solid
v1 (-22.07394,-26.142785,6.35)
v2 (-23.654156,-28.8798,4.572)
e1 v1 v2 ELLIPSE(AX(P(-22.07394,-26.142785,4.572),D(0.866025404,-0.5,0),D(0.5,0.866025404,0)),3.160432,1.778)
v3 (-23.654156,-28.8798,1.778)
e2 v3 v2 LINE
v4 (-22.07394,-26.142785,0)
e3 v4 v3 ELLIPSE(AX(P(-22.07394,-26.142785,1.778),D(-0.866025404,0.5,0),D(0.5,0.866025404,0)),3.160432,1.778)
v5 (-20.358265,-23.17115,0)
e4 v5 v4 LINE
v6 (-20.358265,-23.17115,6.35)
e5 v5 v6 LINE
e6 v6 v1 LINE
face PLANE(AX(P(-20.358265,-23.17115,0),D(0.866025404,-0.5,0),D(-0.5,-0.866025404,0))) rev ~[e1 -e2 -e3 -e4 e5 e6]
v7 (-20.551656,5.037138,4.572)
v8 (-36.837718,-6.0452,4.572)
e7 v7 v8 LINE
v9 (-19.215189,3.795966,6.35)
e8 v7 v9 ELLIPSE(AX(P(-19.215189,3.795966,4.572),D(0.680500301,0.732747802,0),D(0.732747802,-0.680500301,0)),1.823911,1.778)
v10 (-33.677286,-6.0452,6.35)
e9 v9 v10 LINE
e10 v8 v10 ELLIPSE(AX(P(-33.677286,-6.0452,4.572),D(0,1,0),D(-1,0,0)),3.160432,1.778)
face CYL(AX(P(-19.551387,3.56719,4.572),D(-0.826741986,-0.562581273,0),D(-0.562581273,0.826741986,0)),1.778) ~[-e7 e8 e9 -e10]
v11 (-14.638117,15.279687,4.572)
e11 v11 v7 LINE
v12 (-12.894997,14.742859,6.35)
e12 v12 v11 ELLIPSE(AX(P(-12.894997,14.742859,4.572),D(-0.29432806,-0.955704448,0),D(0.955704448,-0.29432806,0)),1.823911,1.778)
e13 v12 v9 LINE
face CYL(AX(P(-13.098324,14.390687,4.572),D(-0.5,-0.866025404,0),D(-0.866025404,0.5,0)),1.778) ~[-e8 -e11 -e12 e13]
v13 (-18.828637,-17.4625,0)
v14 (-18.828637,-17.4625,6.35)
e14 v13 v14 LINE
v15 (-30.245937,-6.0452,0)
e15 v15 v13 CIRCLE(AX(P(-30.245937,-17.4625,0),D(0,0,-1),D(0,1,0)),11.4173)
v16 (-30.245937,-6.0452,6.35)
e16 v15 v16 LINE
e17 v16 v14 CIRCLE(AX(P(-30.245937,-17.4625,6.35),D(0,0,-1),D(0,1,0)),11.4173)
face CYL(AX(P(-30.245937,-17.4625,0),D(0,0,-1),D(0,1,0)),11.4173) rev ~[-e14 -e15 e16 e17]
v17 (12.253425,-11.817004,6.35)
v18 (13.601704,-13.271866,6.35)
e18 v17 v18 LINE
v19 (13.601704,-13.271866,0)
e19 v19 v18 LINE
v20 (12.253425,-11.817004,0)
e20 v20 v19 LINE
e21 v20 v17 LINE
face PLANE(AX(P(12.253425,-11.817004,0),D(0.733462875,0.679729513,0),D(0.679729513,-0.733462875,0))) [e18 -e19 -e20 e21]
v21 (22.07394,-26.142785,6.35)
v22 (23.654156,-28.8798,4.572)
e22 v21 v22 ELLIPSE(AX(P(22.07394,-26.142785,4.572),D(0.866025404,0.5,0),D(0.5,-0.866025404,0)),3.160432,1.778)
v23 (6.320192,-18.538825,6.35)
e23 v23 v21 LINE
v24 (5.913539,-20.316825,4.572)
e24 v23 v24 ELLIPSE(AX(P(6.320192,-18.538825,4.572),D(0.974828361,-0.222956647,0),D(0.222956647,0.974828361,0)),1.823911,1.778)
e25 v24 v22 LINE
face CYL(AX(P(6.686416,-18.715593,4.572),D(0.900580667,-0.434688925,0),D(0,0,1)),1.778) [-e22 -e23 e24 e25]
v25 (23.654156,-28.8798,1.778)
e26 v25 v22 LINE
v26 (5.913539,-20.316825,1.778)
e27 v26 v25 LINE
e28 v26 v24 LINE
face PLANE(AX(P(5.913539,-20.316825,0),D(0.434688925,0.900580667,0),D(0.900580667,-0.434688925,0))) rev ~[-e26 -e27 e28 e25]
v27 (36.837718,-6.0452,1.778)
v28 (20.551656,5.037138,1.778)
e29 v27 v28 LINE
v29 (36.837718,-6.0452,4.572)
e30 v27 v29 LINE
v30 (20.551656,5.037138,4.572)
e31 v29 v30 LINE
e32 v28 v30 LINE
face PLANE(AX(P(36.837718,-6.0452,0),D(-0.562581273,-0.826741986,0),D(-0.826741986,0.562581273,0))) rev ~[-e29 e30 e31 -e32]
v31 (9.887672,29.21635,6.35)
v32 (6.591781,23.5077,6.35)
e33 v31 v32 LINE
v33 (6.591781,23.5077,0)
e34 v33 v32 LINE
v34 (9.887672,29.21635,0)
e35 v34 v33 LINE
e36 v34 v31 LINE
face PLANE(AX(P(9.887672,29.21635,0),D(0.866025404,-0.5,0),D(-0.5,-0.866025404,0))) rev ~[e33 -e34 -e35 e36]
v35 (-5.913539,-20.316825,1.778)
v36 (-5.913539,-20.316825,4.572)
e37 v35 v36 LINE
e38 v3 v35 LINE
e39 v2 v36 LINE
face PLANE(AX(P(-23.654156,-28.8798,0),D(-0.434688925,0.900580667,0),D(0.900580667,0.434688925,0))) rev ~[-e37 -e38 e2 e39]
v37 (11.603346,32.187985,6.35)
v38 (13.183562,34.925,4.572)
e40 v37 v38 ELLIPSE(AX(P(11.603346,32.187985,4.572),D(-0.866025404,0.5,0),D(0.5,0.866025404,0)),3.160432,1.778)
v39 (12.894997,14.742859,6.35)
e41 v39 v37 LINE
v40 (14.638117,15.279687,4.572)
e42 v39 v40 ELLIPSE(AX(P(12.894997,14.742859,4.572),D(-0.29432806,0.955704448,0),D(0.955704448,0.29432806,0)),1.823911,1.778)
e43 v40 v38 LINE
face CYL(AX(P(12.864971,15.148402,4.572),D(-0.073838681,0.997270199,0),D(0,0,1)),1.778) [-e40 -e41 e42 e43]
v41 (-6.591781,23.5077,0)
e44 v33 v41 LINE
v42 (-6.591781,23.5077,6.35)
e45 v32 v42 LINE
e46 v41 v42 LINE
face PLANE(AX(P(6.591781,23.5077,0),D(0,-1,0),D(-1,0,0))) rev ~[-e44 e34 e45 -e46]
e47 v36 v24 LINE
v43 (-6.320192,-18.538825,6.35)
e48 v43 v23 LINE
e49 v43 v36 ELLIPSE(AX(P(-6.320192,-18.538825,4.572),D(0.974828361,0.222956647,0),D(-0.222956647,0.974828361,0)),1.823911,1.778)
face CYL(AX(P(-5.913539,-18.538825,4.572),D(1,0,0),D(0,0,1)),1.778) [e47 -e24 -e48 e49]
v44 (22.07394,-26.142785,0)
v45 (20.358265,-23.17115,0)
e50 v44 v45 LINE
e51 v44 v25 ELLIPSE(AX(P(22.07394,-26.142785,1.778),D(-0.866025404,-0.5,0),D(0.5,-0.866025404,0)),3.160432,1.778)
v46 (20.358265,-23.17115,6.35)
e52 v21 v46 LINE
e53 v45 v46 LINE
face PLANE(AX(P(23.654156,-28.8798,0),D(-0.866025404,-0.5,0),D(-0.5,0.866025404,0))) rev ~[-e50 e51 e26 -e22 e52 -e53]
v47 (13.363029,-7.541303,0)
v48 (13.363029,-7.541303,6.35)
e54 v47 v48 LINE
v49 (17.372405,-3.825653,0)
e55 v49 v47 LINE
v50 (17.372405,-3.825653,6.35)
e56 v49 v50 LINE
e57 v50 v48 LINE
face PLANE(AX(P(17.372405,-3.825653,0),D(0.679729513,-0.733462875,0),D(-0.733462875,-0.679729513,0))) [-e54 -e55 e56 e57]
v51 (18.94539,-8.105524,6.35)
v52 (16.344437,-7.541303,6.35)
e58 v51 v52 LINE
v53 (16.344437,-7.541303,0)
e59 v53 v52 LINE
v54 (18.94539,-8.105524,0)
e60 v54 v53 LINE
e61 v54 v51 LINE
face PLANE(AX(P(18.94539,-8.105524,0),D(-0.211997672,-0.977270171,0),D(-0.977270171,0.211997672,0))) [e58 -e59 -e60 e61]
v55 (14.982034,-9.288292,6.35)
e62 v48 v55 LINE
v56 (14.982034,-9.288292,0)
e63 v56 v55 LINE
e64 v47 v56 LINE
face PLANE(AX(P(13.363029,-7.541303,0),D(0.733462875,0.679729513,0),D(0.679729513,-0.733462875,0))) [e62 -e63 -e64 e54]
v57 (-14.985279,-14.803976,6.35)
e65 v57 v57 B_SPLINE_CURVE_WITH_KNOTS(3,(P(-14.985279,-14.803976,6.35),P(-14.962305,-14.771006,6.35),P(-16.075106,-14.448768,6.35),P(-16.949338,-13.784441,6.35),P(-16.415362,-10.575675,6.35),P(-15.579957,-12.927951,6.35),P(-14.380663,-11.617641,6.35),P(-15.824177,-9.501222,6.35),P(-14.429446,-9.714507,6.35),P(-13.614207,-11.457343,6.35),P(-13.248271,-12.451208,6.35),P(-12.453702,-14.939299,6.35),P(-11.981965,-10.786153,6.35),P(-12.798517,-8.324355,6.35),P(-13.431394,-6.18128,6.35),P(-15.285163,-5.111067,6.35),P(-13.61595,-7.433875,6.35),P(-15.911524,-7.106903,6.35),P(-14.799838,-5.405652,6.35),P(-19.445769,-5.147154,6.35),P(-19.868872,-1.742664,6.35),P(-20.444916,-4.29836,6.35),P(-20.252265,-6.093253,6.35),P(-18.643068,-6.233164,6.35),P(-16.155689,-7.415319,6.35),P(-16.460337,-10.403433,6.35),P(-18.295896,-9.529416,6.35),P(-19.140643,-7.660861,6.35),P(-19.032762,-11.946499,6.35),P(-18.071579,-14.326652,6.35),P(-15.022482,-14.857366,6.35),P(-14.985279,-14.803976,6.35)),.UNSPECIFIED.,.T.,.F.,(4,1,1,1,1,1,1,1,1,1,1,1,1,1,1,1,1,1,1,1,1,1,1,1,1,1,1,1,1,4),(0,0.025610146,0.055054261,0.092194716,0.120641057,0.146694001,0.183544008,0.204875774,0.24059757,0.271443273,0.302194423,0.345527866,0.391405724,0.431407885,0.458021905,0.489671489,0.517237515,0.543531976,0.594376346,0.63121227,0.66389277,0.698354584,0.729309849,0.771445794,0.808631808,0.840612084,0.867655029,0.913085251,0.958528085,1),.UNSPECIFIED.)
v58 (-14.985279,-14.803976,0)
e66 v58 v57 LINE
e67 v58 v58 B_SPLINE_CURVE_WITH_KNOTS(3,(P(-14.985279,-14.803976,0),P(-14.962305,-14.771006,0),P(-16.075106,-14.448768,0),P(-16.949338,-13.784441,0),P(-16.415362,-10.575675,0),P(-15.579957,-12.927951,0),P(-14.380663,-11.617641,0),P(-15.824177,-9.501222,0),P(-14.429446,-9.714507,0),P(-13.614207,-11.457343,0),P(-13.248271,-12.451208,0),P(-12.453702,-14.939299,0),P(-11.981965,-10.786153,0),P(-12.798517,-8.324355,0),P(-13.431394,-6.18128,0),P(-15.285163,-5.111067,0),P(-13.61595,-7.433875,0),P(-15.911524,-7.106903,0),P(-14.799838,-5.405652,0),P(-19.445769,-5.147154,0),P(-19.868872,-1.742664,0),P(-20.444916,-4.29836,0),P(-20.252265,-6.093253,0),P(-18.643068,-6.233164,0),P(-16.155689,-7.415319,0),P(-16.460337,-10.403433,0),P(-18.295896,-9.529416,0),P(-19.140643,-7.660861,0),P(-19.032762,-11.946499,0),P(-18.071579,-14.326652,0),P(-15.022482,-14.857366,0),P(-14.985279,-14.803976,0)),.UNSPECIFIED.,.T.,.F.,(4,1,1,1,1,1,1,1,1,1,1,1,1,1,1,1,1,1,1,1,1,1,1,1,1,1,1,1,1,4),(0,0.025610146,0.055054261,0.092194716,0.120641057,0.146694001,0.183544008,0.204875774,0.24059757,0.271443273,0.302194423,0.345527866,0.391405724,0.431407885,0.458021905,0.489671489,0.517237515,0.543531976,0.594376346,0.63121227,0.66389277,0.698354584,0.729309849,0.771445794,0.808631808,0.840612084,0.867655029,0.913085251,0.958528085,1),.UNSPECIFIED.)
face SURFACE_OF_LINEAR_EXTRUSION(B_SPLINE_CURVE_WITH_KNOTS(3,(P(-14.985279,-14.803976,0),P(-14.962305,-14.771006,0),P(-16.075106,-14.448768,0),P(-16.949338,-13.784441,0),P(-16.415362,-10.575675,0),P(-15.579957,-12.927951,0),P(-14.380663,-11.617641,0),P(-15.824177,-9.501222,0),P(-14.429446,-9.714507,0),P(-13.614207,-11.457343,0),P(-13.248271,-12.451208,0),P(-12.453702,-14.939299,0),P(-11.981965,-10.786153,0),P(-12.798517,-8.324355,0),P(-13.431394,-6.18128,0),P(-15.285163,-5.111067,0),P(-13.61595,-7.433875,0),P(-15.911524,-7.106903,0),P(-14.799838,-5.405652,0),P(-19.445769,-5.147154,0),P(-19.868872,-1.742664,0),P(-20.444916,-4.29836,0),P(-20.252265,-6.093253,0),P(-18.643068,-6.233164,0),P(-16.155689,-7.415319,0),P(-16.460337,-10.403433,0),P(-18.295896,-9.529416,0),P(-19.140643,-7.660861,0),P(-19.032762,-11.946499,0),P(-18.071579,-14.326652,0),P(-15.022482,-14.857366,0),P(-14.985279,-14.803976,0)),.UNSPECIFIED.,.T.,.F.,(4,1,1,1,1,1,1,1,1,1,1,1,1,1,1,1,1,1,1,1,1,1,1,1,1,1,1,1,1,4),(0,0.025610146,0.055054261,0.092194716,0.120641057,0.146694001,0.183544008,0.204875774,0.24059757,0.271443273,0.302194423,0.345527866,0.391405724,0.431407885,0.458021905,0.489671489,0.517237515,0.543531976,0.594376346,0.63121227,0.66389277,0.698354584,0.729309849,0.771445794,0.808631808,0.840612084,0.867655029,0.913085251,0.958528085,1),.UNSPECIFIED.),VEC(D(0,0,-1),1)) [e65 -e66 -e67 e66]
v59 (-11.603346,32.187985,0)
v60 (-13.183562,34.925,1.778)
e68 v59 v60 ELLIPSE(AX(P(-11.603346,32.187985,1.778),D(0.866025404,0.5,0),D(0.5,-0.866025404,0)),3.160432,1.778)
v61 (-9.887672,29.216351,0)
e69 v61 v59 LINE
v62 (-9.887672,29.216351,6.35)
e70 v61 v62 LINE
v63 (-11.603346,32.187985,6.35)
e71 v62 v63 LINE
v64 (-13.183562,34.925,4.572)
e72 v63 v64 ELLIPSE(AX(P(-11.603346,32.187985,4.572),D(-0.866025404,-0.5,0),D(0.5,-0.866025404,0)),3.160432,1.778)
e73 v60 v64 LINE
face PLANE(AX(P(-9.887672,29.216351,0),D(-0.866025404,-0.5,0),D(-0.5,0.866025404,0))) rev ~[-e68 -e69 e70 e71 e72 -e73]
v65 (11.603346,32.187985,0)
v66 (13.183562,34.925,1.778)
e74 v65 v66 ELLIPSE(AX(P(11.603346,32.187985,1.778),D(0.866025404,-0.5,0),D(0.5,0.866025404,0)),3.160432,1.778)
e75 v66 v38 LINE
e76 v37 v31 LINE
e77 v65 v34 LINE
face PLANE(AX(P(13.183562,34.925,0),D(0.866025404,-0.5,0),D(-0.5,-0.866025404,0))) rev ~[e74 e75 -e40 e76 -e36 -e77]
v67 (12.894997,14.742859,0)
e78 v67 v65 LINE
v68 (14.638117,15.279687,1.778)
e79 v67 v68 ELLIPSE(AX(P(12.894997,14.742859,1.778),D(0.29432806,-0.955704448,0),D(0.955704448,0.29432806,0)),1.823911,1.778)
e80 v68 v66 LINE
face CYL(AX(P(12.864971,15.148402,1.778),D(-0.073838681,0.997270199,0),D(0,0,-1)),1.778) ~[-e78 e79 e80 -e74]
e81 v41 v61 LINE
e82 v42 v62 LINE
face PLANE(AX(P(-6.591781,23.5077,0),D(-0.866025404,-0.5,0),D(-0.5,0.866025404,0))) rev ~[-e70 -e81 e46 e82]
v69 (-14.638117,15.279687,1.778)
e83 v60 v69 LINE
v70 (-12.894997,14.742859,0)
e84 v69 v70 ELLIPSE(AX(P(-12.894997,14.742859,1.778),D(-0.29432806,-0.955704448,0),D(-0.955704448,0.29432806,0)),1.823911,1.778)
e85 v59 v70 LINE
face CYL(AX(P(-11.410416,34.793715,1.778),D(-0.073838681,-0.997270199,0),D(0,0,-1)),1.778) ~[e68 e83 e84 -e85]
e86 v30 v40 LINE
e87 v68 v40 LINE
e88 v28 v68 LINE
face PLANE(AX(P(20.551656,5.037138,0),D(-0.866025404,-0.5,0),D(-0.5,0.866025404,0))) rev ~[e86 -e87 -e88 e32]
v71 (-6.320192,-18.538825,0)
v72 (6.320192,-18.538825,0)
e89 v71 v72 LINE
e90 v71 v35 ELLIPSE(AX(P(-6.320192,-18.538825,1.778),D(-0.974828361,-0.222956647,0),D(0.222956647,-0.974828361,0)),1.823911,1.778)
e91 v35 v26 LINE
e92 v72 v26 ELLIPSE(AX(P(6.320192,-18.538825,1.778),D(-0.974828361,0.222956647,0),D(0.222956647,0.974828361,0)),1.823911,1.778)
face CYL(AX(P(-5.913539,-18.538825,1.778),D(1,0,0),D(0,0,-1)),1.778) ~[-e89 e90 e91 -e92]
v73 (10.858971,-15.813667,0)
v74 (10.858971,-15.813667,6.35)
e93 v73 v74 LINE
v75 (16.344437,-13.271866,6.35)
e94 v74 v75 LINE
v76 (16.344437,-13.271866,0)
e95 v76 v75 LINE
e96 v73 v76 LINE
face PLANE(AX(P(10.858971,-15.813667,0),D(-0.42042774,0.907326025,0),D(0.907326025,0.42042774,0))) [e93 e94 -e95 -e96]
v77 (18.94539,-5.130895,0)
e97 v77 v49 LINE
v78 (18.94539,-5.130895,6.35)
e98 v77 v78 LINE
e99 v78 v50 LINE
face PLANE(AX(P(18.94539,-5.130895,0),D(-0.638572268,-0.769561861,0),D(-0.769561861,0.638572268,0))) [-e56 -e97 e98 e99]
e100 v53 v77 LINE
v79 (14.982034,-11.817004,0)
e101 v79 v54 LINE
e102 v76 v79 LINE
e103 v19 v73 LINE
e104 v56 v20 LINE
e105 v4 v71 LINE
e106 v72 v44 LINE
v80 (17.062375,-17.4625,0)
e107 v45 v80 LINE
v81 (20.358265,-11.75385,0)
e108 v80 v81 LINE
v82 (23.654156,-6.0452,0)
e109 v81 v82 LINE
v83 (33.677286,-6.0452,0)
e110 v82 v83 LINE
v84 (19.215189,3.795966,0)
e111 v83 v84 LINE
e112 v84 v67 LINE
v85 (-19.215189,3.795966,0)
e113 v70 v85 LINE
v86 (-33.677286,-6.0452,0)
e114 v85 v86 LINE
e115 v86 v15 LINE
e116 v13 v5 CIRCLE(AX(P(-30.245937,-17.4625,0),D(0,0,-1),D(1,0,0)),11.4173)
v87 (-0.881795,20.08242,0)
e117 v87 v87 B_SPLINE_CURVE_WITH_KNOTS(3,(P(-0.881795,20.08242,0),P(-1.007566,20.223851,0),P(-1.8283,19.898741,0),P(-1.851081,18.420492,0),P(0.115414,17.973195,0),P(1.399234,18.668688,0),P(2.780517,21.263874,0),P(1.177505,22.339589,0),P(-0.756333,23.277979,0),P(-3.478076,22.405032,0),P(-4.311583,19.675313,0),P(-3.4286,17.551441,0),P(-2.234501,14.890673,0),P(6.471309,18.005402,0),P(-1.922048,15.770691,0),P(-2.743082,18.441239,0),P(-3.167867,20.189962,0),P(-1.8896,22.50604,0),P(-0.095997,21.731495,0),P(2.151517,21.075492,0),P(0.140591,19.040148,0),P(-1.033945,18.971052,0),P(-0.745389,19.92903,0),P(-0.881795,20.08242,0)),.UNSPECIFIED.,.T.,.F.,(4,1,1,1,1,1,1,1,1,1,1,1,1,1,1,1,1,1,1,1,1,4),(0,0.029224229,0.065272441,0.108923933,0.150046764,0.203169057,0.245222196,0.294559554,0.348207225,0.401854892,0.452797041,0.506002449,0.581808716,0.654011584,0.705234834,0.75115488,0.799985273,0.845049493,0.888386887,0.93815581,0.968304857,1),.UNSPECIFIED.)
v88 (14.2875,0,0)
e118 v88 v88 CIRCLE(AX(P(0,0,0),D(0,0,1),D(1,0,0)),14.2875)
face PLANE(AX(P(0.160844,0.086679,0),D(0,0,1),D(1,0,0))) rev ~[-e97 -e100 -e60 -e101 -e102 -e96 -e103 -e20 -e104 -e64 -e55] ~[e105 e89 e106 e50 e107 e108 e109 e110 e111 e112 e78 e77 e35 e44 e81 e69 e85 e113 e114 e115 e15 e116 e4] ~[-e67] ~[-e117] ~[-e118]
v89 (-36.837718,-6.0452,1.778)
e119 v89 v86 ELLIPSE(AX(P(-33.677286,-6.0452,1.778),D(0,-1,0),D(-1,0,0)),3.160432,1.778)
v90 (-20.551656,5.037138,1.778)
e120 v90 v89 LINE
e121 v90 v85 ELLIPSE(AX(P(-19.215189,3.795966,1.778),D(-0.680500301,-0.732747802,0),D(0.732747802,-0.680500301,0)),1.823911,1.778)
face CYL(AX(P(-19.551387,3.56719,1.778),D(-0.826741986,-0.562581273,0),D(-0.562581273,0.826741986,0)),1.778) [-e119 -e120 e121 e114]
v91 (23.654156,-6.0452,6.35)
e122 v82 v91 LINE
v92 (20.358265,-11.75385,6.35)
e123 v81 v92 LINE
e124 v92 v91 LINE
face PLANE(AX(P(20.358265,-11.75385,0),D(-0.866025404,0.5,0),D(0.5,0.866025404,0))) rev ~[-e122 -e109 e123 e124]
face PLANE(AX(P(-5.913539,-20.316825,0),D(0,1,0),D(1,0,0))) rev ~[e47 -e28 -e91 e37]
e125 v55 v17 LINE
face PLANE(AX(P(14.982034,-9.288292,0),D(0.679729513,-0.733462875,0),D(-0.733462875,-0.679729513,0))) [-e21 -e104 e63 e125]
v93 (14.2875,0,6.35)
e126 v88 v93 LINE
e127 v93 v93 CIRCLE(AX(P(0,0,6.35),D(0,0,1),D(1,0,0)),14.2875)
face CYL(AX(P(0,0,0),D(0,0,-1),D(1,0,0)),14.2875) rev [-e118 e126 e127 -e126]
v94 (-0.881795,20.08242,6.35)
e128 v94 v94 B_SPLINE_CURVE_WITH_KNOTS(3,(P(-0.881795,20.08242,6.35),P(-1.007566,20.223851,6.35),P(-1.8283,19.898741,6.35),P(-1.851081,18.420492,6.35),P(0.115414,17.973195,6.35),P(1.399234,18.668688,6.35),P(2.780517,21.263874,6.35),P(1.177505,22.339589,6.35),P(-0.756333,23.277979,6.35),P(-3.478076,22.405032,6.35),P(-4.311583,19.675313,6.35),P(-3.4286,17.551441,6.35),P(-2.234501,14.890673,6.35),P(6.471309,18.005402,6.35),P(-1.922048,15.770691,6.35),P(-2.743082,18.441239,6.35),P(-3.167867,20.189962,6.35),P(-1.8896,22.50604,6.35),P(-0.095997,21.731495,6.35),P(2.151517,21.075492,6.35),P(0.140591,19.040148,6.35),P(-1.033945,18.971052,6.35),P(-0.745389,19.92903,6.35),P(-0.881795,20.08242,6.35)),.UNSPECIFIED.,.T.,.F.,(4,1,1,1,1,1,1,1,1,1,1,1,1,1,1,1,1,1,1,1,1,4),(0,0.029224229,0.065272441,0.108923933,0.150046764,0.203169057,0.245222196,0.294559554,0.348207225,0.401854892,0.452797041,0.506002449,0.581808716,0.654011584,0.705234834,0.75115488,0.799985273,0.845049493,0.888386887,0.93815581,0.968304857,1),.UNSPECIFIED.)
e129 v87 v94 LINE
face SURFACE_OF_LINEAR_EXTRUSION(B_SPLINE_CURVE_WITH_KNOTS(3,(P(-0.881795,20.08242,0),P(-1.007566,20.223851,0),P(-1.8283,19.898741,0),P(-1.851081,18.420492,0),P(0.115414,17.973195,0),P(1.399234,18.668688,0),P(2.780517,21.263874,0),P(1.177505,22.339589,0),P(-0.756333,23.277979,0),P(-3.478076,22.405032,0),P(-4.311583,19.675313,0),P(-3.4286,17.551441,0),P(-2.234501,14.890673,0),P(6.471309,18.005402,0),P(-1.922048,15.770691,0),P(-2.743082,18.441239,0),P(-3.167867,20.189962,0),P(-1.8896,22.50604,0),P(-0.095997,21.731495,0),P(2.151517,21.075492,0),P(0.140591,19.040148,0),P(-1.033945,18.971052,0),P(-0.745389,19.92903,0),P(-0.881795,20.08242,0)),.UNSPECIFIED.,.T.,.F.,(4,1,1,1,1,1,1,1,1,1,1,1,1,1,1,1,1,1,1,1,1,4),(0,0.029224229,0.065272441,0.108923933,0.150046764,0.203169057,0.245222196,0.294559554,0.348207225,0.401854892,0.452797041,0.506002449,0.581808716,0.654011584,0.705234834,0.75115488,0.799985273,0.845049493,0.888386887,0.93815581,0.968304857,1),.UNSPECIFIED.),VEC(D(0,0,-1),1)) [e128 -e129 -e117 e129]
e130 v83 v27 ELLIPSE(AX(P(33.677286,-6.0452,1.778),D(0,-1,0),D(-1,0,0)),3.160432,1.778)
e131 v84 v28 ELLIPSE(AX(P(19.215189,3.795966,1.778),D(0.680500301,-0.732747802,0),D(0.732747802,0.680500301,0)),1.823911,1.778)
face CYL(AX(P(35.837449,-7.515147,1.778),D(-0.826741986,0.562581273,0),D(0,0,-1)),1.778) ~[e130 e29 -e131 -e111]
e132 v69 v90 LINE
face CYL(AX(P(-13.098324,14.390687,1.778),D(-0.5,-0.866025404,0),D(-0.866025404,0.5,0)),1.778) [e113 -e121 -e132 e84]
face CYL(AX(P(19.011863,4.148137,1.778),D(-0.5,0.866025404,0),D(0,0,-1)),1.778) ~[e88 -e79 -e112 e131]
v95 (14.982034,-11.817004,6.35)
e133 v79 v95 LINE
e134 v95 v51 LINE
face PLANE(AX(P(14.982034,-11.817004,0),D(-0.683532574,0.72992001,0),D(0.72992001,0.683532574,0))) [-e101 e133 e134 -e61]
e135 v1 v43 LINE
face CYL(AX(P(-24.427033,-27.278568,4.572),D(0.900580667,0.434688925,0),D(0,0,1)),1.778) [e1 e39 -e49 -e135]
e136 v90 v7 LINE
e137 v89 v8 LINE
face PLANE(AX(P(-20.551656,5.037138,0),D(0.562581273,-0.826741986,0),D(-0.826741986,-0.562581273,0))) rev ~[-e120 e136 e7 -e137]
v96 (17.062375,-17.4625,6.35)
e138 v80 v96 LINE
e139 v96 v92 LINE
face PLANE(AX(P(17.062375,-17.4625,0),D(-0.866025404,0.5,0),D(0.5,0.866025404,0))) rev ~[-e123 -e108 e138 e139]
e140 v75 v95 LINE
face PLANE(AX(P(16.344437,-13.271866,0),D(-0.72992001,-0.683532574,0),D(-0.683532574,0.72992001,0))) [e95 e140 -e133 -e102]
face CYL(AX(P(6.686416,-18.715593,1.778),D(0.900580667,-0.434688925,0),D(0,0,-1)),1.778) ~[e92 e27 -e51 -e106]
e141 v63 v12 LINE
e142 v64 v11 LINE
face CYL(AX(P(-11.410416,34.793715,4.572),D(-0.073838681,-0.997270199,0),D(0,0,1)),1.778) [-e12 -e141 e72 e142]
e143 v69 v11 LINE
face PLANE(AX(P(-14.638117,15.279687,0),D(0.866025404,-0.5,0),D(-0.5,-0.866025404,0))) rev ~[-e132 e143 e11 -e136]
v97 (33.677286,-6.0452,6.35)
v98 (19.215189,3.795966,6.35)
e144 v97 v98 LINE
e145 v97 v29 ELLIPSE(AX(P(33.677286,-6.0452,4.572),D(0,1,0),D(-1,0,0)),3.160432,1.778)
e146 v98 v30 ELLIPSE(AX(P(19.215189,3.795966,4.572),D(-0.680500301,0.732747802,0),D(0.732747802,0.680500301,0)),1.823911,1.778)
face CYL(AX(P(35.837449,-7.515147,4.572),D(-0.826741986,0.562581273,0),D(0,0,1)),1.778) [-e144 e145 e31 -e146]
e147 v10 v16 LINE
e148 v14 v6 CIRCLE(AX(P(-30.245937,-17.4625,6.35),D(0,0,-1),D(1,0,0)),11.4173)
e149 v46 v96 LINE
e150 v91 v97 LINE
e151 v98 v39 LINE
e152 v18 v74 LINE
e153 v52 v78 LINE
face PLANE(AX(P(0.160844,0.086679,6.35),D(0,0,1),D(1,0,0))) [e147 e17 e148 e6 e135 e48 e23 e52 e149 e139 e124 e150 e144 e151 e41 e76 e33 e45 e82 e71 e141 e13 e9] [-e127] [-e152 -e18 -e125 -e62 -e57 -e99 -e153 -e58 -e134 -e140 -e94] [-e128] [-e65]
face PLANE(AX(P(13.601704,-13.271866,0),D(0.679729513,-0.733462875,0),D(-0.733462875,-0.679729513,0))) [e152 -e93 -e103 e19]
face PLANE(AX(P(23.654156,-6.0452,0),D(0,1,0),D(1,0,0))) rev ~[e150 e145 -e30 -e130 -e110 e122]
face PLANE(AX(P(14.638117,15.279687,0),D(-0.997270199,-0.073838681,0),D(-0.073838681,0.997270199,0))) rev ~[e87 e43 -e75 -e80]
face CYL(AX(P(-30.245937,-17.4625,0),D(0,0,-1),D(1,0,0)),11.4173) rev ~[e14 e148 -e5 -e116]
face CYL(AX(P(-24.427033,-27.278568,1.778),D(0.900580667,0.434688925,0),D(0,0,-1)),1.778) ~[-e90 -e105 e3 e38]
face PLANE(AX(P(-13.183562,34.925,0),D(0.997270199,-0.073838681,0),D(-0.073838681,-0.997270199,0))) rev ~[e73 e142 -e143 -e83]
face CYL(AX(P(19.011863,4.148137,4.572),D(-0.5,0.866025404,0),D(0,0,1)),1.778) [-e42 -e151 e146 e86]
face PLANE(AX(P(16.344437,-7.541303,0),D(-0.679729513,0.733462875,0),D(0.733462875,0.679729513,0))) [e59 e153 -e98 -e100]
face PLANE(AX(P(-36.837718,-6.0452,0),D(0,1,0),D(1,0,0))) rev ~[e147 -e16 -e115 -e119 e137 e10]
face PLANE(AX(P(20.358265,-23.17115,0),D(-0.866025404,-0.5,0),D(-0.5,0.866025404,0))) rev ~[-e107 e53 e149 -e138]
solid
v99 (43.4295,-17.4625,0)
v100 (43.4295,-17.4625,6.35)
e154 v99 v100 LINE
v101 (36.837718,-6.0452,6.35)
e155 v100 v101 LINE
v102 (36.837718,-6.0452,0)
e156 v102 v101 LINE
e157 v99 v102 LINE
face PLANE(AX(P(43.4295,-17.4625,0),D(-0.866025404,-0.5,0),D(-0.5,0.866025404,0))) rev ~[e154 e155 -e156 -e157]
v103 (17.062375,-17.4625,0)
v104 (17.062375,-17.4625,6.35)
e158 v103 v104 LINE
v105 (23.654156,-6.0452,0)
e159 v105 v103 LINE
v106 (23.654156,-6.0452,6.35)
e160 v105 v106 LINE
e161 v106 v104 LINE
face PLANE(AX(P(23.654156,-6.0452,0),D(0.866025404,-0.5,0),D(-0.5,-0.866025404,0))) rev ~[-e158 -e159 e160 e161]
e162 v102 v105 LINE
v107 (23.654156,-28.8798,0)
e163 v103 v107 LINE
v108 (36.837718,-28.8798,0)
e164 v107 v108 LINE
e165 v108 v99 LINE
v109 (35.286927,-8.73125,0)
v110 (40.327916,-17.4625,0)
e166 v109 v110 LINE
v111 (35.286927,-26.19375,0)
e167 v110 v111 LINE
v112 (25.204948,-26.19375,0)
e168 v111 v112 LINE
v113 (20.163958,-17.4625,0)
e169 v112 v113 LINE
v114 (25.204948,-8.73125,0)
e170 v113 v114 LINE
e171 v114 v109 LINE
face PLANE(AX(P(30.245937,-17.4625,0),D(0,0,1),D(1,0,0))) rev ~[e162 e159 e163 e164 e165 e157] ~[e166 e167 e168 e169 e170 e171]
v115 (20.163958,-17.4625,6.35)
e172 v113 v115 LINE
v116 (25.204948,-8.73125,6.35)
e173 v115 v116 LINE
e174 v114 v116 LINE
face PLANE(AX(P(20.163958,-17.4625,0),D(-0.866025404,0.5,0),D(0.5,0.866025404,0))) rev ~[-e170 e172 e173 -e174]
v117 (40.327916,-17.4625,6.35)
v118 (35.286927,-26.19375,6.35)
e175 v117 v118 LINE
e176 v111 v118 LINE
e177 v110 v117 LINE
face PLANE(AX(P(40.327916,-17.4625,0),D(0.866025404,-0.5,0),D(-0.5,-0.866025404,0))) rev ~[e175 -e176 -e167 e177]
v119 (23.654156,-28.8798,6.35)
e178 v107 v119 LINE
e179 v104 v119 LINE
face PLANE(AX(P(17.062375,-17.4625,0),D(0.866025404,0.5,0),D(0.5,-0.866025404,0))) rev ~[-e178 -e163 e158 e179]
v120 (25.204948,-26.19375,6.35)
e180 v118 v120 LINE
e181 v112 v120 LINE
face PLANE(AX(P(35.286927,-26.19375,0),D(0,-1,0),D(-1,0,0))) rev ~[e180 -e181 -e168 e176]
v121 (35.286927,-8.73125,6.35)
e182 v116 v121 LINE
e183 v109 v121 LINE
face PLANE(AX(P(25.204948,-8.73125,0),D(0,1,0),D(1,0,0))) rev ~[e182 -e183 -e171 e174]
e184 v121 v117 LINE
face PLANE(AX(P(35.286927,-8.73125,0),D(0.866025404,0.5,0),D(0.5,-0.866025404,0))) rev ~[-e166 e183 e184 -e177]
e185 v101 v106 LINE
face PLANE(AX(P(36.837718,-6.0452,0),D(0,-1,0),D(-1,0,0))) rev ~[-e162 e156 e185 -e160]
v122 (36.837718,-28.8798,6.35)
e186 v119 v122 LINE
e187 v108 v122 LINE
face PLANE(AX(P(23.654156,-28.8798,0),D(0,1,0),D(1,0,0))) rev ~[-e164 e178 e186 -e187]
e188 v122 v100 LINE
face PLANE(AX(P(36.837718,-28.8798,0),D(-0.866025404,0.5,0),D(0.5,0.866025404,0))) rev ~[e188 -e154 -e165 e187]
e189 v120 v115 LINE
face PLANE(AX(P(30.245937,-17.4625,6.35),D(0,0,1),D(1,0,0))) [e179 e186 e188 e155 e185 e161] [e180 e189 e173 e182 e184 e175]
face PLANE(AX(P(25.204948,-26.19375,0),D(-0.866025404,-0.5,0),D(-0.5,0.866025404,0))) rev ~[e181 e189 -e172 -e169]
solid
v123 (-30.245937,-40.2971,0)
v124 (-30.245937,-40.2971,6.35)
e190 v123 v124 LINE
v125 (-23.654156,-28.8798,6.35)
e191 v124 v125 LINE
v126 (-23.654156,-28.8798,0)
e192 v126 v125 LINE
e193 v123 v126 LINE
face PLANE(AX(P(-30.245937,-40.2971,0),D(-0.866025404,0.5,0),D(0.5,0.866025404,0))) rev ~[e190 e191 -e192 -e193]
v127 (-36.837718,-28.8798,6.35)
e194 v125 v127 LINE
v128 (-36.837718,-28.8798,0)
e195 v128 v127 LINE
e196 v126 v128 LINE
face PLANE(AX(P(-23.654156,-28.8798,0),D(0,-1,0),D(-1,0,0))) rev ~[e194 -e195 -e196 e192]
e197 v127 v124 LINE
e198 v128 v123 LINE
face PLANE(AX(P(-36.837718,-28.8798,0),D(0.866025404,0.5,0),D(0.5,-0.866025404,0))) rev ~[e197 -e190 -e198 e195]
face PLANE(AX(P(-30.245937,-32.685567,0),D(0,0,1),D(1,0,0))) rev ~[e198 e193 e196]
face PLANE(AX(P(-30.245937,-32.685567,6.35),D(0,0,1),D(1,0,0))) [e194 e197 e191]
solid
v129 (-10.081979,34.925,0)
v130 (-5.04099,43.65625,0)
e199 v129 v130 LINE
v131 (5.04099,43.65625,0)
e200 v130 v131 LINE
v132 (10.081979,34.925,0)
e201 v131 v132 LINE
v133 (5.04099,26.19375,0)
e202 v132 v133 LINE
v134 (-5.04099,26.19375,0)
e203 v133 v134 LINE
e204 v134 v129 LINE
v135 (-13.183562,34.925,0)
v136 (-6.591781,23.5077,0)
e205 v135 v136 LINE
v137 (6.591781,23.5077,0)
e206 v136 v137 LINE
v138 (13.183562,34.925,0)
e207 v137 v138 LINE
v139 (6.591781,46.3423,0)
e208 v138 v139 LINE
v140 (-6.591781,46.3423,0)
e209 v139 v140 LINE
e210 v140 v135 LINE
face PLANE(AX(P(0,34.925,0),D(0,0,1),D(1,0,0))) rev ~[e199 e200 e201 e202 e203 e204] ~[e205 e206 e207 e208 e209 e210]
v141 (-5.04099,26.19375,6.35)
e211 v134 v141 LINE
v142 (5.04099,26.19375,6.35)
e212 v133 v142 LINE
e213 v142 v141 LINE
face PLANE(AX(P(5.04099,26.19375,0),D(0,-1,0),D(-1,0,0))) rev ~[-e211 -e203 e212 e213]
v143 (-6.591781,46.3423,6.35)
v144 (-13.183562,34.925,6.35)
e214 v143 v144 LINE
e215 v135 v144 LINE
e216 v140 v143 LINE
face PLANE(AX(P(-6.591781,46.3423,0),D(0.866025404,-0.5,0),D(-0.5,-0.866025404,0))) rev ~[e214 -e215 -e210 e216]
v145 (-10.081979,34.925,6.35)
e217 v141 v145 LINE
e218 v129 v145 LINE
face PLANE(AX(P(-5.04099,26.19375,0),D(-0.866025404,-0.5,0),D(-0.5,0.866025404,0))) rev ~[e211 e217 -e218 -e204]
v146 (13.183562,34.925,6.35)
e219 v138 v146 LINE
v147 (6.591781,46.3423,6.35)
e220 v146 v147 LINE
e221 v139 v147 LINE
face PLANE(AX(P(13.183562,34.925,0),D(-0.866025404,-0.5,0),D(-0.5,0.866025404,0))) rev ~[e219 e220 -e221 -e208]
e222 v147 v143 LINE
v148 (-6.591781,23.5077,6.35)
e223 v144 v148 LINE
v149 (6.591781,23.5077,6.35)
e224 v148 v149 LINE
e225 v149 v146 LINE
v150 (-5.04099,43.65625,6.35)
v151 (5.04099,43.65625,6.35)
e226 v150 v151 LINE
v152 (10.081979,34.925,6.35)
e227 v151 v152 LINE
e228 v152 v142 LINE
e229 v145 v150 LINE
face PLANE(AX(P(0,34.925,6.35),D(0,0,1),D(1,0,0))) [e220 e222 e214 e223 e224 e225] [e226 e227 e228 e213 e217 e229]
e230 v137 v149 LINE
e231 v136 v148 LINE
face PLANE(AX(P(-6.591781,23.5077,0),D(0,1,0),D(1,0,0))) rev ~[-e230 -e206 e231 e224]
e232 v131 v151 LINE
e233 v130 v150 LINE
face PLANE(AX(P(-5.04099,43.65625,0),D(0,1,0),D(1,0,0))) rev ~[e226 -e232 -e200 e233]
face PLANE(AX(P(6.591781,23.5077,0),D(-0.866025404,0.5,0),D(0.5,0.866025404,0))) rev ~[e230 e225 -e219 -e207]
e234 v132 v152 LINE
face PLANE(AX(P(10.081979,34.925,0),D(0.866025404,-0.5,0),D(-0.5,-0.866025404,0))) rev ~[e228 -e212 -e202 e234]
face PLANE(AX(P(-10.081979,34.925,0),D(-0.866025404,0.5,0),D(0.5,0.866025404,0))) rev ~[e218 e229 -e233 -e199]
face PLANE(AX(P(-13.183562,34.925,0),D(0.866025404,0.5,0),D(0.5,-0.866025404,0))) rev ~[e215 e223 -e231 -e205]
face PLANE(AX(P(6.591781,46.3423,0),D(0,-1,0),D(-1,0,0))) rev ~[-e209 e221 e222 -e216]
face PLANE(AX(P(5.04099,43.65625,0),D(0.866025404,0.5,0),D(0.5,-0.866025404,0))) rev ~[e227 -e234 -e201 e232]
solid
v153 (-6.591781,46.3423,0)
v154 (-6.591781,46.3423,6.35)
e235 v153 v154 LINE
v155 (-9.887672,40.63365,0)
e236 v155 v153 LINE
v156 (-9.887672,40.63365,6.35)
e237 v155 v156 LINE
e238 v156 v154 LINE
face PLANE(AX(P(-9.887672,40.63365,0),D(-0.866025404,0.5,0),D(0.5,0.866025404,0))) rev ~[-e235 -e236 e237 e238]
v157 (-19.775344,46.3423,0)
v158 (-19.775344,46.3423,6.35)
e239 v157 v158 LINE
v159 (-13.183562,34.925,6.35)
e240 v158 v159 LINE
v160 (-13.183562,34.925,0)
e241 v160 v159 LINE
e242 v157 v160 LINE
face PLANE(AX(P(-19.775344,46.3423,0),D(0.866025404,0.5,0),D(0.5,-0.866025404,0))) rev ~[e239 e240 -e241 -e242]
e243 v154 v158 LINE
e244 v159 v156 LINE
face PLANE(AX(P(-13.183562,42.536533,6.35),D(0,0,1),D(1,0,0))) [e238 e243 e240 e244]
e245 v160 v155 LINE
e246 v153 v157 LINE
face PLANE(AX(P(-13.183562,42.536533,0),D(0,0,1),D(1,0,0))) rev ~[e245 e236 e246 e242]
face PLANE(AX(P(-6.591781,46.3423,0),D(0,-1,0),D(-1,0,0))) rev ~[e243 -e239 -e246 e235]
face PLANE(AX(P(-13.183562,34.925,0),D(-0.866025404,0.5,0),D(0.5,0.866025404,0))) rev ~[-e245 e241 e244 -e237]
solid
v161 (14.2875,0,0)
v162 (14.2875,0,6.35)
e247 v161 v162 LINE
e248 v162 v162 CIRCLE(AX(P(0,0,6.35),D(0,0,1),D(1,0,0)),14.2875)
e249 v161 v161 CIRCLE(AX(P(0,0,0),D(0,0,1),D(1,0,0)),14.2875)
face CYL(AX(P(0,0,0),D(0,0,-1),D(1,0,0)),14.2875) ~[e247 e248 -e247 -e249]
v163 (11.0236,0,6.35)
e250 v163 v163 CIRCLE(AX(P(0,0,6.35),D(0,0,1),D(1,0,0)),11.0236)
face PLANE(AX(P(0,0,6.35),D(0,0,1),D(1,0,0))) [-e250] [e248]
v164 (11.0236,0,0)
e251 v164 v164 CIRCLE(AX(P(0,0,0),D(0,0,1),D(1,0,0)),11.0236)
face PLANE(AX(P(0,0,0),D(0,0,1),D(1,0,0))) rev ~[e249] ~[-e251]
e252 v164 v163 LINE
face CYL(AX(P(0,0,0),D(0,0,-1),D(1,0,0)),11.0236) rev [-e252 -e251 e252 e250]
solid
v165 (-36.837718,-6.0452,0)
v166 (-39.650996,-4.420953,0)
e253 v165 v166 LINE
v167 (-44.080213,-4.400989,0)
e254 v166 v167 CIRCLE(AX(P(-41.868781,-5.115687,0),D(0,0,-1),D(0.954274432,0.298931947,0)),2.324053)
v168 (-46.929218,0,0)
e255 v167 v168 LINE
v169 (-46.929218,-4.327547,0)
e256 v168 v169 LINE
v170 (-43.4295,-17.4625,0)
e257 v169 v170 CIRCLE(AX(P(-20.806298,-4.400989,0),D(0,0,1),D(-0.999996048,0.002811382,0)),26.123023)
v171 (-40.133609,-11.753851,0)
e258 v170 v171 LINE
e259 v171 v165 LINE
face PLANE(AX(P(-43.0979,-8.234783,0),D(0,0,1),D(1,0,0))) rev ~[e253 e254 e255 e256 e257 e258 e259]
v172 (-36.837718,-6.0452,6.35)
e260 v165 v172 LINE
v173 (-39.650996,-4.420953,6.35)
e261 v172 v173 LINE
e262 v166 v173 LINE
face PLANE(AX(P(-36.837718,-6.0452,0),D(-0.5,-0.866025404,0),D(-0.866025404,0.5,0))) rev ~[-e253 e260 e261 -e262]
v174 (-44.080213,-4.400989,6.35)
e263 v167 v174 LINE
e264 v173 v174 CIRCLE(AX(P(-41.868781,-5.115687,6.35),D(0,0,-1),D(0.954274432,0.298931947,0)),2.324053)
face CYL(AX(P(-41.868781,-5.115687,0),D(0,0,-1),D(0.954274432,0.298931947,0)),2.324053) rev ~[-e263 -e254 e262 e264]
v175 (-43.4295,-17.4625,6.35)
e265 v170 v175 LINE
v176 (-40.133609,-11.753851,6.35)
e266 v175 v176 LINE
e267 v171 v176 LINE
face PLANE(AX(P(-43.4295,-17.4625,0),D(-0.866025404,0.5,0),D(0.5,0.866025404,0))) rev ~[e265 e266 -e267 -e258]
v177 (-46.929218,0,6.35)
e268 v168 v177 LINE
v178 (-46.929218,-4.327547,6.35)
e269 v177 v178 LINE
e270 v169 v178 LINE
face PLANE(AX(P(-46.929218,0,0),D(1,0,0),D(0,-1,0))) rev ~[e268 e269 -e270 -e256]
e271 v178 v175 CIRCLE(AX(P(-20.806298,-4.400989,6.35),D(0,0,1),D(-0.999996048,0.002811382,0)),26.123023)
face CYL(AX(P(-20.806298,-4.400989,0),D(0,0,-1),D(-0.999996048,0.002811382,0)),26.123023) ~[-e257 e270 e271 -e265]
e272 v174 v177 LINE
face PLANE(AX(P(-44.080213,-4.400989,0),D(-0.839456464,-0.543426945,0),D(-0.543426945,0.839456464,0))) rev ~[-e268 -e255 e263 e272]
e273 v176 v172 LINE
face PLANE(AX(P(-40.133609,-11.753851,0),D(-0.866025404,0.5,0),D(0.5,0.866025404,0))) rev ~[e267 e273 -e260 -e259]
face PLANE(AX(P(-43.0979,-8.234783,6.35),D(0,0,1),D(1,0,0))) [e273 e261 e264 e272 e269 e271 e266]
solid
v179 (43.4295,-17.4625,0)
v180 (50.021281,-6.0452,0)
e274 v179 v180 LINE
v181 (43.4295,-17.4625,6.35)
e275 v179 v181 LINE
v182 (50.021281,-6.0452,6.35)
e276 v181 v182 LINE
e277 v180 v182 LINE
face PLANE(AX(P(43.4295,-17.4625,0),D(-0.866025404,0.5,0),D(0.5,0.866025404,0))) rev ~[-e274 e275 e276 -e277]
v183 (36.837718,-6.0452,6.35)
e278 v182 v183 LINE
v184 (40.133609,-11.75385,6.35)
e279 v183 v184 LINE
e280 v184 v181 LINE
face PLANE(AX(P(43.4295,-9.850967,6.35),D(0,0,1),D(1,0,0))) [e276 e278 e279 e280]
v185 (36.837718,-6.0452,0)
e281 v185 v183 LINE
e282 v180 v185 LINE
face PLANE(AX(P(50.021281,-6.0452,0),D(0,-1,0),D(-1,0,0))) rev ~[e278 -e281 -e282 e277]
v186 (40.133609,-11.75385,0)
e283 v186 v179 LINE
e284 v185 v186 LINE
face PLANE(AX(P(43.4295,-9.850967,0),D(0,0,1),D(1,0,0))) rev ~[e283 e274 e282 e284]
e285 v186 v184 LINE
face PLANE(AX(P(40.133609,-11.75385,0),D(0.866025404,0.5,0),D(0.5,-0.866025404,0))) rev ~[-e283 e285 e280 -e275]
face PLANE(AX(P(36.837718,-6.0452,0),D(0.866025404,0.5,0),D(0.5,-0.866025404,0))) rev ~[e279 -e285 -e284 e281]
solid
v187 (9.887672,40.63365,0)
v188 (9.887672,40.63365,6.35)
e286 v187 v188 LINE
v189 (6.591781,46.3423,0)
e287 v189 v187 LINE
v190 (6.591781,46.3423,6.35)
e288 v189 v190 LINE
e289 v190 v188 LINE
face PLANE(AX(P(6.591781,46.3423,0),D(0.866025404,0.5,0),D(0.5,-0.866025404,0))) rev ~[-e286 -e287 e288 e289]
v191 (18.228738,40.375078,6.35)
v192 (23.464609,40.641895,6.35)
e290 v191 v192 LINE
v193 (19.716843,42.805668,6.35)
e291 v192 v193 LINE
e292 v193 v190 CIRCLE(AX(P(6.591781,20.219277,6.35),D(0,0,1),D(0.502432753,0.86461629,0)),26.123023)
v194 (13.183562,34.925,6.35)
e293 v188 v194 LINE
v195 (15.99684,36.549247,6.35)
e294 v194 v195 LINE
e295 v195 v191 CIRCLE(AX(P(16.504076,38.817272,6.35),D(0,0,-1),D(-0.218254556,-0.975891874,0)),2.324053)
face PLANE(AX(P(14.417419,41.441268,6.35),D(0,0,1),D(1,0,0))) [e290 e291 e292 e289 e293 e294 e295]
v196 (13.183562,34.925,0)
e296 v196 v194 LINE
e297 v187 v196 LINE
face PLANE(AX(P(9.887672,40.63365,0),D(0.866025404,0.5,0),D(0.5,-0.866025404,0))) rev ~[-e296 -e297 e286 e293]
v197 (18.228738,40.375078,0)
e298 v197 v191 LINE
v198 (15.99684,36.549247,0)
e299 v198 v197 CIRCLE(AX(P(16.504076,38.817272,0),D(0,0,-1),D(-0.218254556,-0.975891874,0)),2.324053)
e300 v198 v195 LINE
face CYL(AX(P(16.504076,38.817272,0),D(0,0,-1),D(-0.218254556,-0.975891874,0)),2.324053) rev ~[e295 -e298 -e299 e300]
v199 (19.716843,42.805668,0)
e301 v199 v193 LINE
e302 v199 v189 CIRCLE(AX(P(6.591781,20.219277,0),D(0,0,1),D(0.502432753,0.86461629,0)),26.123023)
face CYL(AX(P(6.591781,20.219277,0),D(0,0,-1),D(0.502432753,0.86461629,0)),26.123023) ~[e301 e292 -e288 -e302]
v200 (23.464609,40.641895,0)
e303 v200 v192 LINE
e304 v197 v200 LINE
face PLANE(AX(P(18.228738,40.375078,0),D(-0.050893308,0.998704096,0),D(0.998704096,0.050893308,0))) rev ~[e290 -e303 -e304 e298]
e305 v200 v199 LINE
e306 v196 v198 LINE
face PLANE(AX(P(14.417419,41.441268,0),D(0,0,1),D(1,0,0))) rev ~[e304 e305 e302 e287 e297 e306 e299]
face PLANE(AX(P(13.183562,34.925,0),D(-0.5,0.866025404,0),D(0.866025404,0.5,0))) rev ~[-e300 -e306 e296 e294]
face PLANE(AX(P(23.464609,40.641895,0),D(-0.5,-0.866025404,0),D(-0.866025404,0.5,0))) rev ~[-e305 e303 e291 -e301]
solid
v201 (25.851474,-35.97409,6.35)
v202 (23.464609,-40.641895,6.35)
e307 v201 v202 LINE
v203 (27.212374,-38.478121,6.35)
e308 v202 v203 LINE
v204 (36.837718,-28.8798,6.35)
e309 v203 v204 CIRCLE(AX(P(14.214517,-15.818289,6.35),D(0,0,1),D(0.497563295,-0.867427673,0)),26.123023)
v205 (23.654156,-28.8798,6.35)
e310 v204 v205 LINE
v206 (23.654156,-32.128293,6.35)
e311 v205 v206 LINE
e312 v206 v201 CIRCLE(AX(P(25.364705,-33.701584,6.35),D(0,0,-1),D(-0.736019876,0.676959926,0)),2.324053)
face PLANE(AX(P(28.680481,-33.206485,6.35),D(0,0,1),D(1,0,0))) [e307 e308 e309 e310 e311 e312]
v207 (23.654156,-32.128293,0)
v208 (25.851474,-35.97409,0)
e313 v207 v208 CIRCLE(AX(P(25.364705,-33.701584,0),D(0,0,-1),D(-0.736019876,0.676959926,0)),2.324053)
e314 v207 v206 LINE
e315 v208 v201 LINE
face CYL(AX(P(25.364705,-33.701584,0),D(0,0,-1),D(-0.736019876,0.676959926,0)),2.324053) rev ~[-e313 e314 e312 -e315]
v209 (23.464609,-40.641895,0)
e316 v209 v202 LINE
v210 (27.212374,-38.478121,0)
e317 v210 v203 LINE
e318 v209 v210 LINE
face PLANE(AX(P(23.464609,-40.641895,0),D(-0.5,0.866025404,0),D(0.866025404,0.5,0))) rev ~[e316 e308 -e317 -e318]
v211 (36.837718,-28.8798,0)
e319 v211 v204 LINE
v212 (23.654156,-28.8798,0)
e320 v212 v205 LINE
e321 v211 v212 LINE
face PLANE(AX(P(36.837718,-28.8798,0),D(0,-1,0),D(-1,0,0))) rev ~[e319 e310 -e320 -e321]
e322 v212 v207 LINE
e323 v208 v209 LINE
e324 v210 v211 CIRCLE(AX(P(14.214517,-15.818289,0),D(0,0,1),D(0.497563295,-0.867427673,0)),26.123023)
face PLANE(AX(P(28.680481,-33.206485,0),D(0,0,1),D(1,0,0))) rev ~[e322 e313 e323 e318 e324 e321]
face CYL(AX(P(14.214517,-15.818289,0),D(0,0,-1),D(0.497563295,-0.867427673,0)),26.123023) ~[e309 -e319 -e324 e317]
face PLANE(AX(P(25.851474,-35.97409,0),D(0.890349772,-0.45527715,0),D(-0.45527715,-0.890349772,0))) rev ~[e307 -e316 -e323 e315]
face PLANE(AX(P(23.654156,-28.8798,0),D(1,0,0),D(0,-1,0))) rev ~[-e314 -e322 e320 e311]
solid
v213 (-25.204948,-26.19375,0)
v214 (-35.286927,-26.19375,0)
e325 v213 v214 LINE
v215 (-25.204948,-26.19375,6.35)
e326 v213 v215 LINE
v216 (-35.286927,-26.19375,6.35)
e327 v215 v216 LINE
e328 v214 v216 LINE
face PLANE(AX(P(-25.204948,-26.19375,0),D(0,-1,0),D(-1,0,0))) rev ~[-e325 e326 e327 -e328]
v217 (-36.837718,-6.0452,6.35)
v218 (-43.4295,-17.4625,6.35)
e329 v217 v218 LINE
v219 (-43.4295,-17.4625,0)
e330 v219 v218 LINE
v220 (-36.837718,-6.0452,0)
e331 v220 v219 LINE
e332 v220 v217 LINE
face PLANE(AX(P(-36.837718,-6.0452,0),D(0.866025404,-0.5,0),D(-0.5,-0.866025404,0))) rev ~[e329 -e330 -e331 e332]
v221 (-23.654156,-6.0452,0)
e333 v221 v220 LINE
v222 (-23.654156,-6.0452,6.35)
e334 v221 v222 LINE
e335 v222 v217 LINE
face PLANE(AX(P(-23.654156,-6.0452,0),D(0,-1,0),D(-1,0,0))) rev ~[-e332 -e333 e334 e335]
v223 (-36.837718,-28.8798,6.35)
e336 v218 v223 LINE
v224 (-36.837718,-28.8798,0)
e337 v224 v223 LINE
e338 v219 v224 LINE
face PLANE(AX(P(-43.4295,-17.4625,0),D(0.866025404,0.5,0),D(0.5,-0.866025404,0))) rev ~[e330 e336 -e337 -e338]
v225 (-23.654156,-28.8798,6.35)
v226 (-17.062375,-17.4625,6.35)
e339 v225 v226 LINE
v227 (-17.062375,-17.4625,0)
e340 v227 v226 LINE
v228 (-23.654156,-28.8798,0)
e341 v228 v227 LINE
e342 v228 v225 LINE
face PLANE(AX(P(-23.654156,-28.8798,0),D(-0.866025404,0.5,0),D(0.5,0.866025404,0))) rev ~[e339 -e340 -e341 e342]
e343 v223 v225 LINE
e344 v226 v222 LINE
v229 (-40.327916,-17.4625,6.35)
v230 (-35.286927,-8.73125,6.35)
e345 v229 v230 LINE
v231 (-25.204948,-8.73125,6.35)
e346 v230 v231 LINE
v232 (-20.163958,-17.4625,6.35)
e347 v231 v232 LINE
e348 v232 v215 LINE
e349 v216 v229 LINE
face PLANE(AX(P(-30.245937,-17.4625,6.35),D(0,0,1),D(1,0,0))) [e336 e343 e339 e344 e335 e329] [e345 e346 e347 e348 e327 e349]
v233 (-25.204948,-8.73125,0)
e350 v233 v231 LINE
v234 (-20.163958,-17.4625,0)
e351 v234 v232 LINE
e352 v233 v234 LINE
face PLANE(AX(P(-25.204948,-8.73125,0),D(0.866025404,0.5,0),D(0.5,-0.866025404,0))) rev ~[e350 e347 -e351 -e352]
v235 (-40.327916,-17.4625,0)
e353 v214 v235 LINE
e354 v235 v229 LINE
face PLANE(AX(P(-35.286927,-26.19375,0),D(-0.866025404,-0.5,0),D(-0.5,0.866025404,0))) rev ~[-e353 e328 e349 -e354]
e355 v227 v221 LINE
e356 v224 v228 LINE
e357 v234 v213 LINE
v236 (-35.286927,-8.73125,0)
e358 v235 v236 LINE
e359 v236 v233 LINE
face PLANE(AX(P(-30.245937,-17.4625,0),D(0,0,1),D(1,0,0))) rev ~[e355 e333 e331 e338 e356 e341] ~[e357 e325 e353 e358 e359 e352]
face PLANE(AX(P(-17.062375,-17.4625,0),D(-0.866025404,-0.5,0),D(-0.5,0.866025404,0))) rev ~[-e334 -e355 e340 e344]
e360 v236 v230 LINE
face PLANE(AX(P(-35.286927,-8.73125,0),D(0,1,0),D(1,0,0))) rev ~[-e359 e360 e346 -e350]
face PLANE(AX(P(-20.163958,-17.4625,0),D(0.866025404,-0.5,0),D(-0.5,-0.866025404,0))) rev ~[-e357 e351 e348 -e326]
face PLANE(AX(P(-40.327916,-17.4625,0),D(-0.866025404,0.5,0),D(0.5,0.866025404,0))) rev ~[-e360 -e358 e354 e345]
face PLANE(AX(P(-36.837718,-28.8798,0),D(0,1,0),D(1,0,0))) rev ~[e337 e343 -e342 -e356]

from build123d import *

# Parameters (mm, degrees)
F1_R     = 14.2875
F2_DEPTH = 6.35
F0_R     = 14.2875
F0_R_2   = 11.0236
F4_DEPTH = 6.35
F5_R     = 1.778


with BuildPart() as f2:
    # F1 (on Top) → F2 (new body)
    with BuildSketch(Plane.XY):
        with BuildLine():
            Line((-20.5516560741, 5.0371375), (-36.8377184556, -6.0452))
            Line((-36.8377184556, -6.0452), (-30.2459372272, -6.0452))
            ThreePointArc((-30.2459372272, -6.0452), (-22.1726869743, -9.3892497472), (-18.8286372272, -17.4625))
            ThreePointArc((-18.8286372272, -17.4625), (-19.217672238, -20.417514487), (-20.358265181, -23.1711496474))
            Line((-20.358265181, -23.1711496474), (-23.6541559988, -28.8798))
            Line((-23.6541559988, -28.8798), (-5.9135389997, -20.316825))
            Line((-5.9135389997, -20.316825), (5.9135389997, -20.316825))
            Line((5.9135389997, -20.316825), (23.6541559988, -28.8798))
            Line((23.6541559988, -28.8798), (20.3582654511, -23.1711501152))
            Line((20.3582654511, -23.1711501152), (17.0623747703, -17.4625))
            Line((17.0623747703, -17.4625), (20.3582651349, -11.7538504325))
            Line((20.3582651349, -11.7538504325), (23.6541559988, -6.0452))
            Line((23.6541559988, -6.0452), (30.2459372272, -6.0452))
            Line((30.2459372272, -6.0452), (36.8377184556, -6.0452))
            Line((36.8377184556, -6.0452), (20.5516560741, 5.0371375))
            Line((20.5516560741, 5.0371375), (14.6381170744, 15.2796875))
            Line((14.6381170744, 15.2796875), (13.1835624568, 34.925))
            Line((13.1835624568, 34.925), (9.8876717015, 29.2163497555))
            Line((9.8876717015, 29.2163497555), (6.5917812284, 23.5077))
            Line((6.5917812284, 23.5077), (0, 23.5077))
            Line((0, 23.5077), (-6.5917812284, 23.5077))
            Line((-6.5917812284, 23.5077), (-9.8876721491, 29.2163505308))
            Line((-9.8876721491, 29.2163505308), (-13.1835624568, 34.925))
            Line((-13.1835624568, 34.925), (-14.6381170744, 15.2796875))
            Line((-14.6381170744, 15.2796875), (-20.5516560741, 5.0371375))
        make_face()
        Circle(F1_R, mode=Mode.SUBTRACT)
    extrude(amount=F2_DEPTH)

    # F3 (on Top) → F4 (cut)
    with BuildSketch(Plane.XY):
        Polygon((18.9453903586, -8.1055236718), (16.3444373757, -7.5413030572), (18.9453903586, -5.1308954337), (17.3724049037, -3.8256528787), (13.3630285141, -7.5413030572), (14.9820335209, -9.2882921808), (12.2534246479, -11.8170036465), (13.6017040761, -13.2718660383), (10.8589707764, -15.8136671774), (16.3444373757, -13.2718660383), (14.9820335209, -11.8170036465), align=None)
        with BuildLine():
            add(Edge.make_bspline(
                [(-0.8817947237, 20.0824197382), (-1.0075664363, 20.2238511955), (-1.8282999289, 19.8987410627), (-1.8510807176, 18.4204917331), (0.1154141916, 17.9731951571), (1.3992341464, 18.6686879762), (2.7805172326, 21.2638739316), (1.1775048058, 22.3395891298), (-0.7563332235, 23.2779789446), (-3.4780762373, 22.4050316842), (-4.3115834076, 19.6753132276), (-3.4286001584, 17.5514412276), (-2.2345013378, 14.8906729818), (6.4713090932, 18.0054024378), (-1.922048173, 15.7706909758), (-2.7430823494, 18.4412394848), (-3.1678669838, 20.1899616032), (-1.8896002645, 22.5060398746), (-0.095997299, 21.7314951338), (2.1515170738, 21.0754922038), (0.1405906438, 19.0401476636), (-1.0339454481, 18.9710523168), (-0.7453889895, 19.9290302249), (-0.8817947237, 20.0824197382)],
                knots=[0, 0, 0, 0, 0.0292242291, 0.0652724413, 0.108923933, 0.1500467643, 0.2031690575, 0.2452221963, 0.2945595542, 0.3482072254, 0.4018548917, 0.4527970409, 0.5060024489, 0.5818087159, 0.6540115837, 0.705234834, 0.7511548795, 0.7999852729, 0.8450494925, 0.888386887, 0.9381558104, 0.9683048569, 1, 1, 1, 1], degree=3))
        make_face()
        with BuildLine():
            add(Edge.make_bspline(
                [(-14.9852787245, -14.803975754), (-14.962304639, -14.7710058159), (-16.0751064868, -14.4487676827), (-16.9493376323, -13.7844407153), (-16.4153619195, -10.5756747049), (-15.5799569425, -12.9279508378), (-14.3806627568, -11.6176411833), (-15.8241772837, -9.5012222196), (-14.4294463891, -9.7145071424), (-13.6142068864, -11.4573431251), (-13.2482714067, -12.4512081263), (-12.4537024099, -14.9392992259), (-11.9819647052, -10.7861534353), (-12.7985167121, -8.3243550918), (-13.4313940545, -6.1812801335), (-15.2851630075, -5.1110667924), (-13.6159495138, -7.4338752765), (-15.9115240061, -7.1069026674), (-14.7998378074, -5.405651807), (-19.4457689348, -5.1471537646), (-19.8688721794, -1.742664042), (-20.4449161419, -4.2983598335), (-20.2522653632, -6.0932530851), (-18.6430682396, -6.2331643715), (-16.1556892371, -7.415318527), (-16.4603369048, -10.4034326443), (-18.2958958989, -9.5294161962), (-19.1406427169, -7.6608606548), (-19.0327624107, -11.9464988775), (-18.0715793146, -14.3266515145), (-15.0224819232, -14.8573657859), (-14.9852787245, -14.803975754)],
                knots=[0, 0, 0, 0, 0.0256101455, 0.0550542613, 0.0921947156, 0.1206410575, 0.1466940011, 0.1835440079, 0.2048757742, 0.2405975701, 0.2714432733, 0.3021944228, 0.3455278657, 0.3914057237, 0.4314078855, 0.4580219051, 0.4896714886, 0.5172375148, 0.543531976, 0.5943763459, 0.6312122696, 0.66389277, 0.6983545837, 0.7293098495, 0.7714457944, 0.8086318082, 0.8406120839, 0.8676550288, 0.9130852515, 0.9585280846, 1, 1, 1, 1], degree=3))
        make_face()
        Polygon((17.0623747703, -17.4625), (23.6541559988, -28.8798), (36.8377184556, -28.8798), (43.429499684, -17.4625), (36.8377184556, -6.0452), (23.6541559988, -6.0452), align=None)
    extrude(amount=F4_DEPTH, mode=Mode.SUBTRACT)

    # F5
    f5_edges = [f2.edges().sort_by_distance(p)[0] for p in [
        (13.91084, 25.102344, 6.35),
        (17.594887, 10.158412, 6.35),
        (28.694687, -0.504031, 6.35),
        (13.91084, 25.102344, 0),
        (17.594887, 10.158412, 0),
        (28.694687, -0.504031, 0),
        (-13.91084, 25.102344, 6.35),
        (-17.594887, 10.158413, 6.35),
        (-28.694687, -0.504031, 6.35),
        (-17.594887, 10.158413, 0),
        (-13.91084, 25.102344, 0),
        (-28.694687, -0.504031, 0),
        (0, -20.316825, 0),
        (-14.783847, -24.598312, 6.35),
        (-14.783847, -24.598312, 0),
        (0, -20.316825, 6.35),
        (14.783847, -24.598312, 6.35),
        (14.783847, -24.598312, 0),
    ]]
    fillet(f5_edges, radius=F5_R)


with BuildPart() as f2b:
    # F1 (on Top) → F2, piece 2 (new body)
    with BuildSketch(Plane.XY):
        Polygon((-19.7753436853, 46.3423), (-13.1835624568, 34.925), (-9.8876720638, 40.6336496169), (-6.5917812284, 46.3423), align=None)
    extrude(amount=F2_DEPTH)


with BuildPart() as f2c:
    # F1 (on Top) → F2, piece 3 (new body)
    with BuildSketch(Plane.XY):
        with BuildLine():
            ThreePointArc((19.7168434682, 42.8056682621), (13.3883800625, 45.4426505756), (6.5917812284, 46.3423))
            Line((6.5917812284, 46.3423), (9.8876717761, 40.6336501152))
            Line((9.8876717761, 40.6336501152), (13.1835624568, 34.925))
            Line((13.1835624568, 34.925), (15.9968403488, 36.5492467482))
            ThreePointArc((15.9968403488, 36.5492467482), (14.4966445581, 39.9883584633), (18.2287384143, 40.3750783203))
            Line((18.2287384143, 40.3750783203), (23.4646089375, 40.6418948595))
            Line((23.4646089375, 40.6418948595), (19.7168434682, 42.8056682621))
        make_face()
    extrude(amount=F2_DEPTH)


with BuildPart() as f2d:
    # F1 (on Top) → F2, piece 4 (new body)
    with BuildSketch(Plane.XY):
        Polygon((40.1336093195, -11.7538504325), (43.429499684, -17.4625), (50.0212809124, -6.0452), (36.8377184556, -6.0452), align=None)
    extrude(amount=F2_DEPTH)


with BuildPart() as f2e:
    # F1 (on Top) → F2, piece 5 (new body)
    with BuildSketch(Plane.XY):
        with BuildLine():
            Line((30.2459372272, -28.8798), (23.6541559988, -28.8798))
            Line((23.6541559988, -28.8798), (23.6541559988, -32.1282934964))
            ThreePointArc((23.6541559988, -32.1282934964), (27.3826120058, -32.5486416886), (25.851474298, -35.9740897059))
            Line((25.851474298, -35.9740897059), (23.4646089375, -40.6418948595))
            Line((23.4646089375, -40.6418948595), (27.2123744068, -38.4781214569))
            ThreePointArc((27.2123744068, -38.4781214569), (32.6602997825, -34.3160025375), (36.8377184556, -28.8798))
            Line((36.8377184556, -28.8798), (30.2459372272, -28.8798))
        make_face()
    extrude(amount=F2_DEPTH)


with BuildPart() as f2f:
    # F1 (on Top) → F2, piece 6 (new body)
    with BuildSketch(Plane.XY):
        Polygon((-23.6541559988, -28.8798), (-30.2459372272, -28.8798), (-36.8377184556, -28.8798), (-30.2459372272, -40.2971), align=None)
    extrude(amount=F2_DEPTH)


with BuildPart() as f2g:
    # F1 (on Top) → F2, piece 7 (new body)
    with BuildSketch(Plane.XY):
        with BuildLine():
            Line((-40.1336093656, -11.7538505124), (-36.8377184556, -6.0452))
            Line((-36.8377184556, -6.0452), (-39.6509963475, -4.4209532518))
            ThreePointArc((-39.6509963475, -4.4209532518), (-41.8792565639, -7.4397167747), (-44.0802127123, -4.4009886144))
            Line((-44.0802127123, -4.4009886144), (-46.929217875, 0))
            Line((-46.929217875, 0), (-46.929217875, -4.3275468051))
            ThreePointArc((-46.929217875, -4.3275468051), (-46.048679845, -11.1266480381), (-43.429499684, -17.4625))
            Line((-43.429499684, -17.4625), (-40.1336093656, -11.7538505124))
        make_face()
    extrude(amount=F2_DEPTH)


with BuildPart() as f2h:
    # F0 (on Top) → F2, piece 8 (new body)
    with BuildSketch(Plane.XY):
        Polygon((-6.5917812284, 23.5077), (6.5917812284, 23.5077), (13.1835624568, 34.925), (6.5917812284, 46.3423), (-6.5917812284, 46.3423), (-13.1835624568, 34.925), align=None)
        Polygon((10.0819790757, 34.925), (5.0409895379, 26.19375), (-5.0409895379, 26.19375), (-10.0819790757, 34.925), (-5.0409895379, 43.65625), (5.0409895379, 43.65625), align=None, mode=Mode.SUBTRACT)
    extrude(amount=F2_DEPTH)


with BuildPart() as f2i:
    # F0 (on Top) → F2, piece 9 (new body)
    with BuildSketch(Plane.XY):
        Polygon((43.429499684, -17.4625), (36.8377184556, -6.0452), (23.6541559988, -6.0452), (17.0623747703, -17.4625), (23.6541559988, -28.8798), (36.8377184556, -28.8798), align=None)
        Polygon((35.286926765, -26.19375), (25.2049476893, -26.19375), (20.1639581514, -17.4625), (25.2049476893, -8.73125), (35.286926765, -8.73125), (40.3279163029, -17.4625), align=None, mode=Mode.SUBTRACT)
    extrude(amount=F2_DEPTH)


with BuildPart() as f2j:
    # F0 (on Top) → F2, piece 10 (new body)
    with BuildSketch(Plane.XY):
        Polygon((-36.8377184556, -28.8798), (-23.6541559988, -28.8798), (-17.0623747703, -17.4625), (-23.6541559988, -6.0452), (-36.8377184556, -6.0452), (-43.429499684, -17.4625), align=None)
        Polygon((-40.3279163029, -17.4625), (-35.286926765, -8.73125), (-25.2049476893, -8.73125), (-20.1639581514, -17.4625), (-25.2049476893, -26.19375), (-35.286926765, -26.19375), align=None, mode=Mode.SUBTRACT)
    extrude(amount=F2_DEPTH)


with BuildPart() as f2k:
    # F0 (on Top) → F2, piece 11 (new body)
    with BuildSketch(Plane.XY):
        Circle(F0_R)
        Circle(F0_R_2, mode=Mode.SUBTRACT)
    extrude(amount=F2_DEPTH)


solid = Compound([f2.part, f2b.part, f2c.part, f2d.part, f2e.part, f2f.part, f2g.part, f2h.part, f2i.part, f2j.part, f2k.part])
